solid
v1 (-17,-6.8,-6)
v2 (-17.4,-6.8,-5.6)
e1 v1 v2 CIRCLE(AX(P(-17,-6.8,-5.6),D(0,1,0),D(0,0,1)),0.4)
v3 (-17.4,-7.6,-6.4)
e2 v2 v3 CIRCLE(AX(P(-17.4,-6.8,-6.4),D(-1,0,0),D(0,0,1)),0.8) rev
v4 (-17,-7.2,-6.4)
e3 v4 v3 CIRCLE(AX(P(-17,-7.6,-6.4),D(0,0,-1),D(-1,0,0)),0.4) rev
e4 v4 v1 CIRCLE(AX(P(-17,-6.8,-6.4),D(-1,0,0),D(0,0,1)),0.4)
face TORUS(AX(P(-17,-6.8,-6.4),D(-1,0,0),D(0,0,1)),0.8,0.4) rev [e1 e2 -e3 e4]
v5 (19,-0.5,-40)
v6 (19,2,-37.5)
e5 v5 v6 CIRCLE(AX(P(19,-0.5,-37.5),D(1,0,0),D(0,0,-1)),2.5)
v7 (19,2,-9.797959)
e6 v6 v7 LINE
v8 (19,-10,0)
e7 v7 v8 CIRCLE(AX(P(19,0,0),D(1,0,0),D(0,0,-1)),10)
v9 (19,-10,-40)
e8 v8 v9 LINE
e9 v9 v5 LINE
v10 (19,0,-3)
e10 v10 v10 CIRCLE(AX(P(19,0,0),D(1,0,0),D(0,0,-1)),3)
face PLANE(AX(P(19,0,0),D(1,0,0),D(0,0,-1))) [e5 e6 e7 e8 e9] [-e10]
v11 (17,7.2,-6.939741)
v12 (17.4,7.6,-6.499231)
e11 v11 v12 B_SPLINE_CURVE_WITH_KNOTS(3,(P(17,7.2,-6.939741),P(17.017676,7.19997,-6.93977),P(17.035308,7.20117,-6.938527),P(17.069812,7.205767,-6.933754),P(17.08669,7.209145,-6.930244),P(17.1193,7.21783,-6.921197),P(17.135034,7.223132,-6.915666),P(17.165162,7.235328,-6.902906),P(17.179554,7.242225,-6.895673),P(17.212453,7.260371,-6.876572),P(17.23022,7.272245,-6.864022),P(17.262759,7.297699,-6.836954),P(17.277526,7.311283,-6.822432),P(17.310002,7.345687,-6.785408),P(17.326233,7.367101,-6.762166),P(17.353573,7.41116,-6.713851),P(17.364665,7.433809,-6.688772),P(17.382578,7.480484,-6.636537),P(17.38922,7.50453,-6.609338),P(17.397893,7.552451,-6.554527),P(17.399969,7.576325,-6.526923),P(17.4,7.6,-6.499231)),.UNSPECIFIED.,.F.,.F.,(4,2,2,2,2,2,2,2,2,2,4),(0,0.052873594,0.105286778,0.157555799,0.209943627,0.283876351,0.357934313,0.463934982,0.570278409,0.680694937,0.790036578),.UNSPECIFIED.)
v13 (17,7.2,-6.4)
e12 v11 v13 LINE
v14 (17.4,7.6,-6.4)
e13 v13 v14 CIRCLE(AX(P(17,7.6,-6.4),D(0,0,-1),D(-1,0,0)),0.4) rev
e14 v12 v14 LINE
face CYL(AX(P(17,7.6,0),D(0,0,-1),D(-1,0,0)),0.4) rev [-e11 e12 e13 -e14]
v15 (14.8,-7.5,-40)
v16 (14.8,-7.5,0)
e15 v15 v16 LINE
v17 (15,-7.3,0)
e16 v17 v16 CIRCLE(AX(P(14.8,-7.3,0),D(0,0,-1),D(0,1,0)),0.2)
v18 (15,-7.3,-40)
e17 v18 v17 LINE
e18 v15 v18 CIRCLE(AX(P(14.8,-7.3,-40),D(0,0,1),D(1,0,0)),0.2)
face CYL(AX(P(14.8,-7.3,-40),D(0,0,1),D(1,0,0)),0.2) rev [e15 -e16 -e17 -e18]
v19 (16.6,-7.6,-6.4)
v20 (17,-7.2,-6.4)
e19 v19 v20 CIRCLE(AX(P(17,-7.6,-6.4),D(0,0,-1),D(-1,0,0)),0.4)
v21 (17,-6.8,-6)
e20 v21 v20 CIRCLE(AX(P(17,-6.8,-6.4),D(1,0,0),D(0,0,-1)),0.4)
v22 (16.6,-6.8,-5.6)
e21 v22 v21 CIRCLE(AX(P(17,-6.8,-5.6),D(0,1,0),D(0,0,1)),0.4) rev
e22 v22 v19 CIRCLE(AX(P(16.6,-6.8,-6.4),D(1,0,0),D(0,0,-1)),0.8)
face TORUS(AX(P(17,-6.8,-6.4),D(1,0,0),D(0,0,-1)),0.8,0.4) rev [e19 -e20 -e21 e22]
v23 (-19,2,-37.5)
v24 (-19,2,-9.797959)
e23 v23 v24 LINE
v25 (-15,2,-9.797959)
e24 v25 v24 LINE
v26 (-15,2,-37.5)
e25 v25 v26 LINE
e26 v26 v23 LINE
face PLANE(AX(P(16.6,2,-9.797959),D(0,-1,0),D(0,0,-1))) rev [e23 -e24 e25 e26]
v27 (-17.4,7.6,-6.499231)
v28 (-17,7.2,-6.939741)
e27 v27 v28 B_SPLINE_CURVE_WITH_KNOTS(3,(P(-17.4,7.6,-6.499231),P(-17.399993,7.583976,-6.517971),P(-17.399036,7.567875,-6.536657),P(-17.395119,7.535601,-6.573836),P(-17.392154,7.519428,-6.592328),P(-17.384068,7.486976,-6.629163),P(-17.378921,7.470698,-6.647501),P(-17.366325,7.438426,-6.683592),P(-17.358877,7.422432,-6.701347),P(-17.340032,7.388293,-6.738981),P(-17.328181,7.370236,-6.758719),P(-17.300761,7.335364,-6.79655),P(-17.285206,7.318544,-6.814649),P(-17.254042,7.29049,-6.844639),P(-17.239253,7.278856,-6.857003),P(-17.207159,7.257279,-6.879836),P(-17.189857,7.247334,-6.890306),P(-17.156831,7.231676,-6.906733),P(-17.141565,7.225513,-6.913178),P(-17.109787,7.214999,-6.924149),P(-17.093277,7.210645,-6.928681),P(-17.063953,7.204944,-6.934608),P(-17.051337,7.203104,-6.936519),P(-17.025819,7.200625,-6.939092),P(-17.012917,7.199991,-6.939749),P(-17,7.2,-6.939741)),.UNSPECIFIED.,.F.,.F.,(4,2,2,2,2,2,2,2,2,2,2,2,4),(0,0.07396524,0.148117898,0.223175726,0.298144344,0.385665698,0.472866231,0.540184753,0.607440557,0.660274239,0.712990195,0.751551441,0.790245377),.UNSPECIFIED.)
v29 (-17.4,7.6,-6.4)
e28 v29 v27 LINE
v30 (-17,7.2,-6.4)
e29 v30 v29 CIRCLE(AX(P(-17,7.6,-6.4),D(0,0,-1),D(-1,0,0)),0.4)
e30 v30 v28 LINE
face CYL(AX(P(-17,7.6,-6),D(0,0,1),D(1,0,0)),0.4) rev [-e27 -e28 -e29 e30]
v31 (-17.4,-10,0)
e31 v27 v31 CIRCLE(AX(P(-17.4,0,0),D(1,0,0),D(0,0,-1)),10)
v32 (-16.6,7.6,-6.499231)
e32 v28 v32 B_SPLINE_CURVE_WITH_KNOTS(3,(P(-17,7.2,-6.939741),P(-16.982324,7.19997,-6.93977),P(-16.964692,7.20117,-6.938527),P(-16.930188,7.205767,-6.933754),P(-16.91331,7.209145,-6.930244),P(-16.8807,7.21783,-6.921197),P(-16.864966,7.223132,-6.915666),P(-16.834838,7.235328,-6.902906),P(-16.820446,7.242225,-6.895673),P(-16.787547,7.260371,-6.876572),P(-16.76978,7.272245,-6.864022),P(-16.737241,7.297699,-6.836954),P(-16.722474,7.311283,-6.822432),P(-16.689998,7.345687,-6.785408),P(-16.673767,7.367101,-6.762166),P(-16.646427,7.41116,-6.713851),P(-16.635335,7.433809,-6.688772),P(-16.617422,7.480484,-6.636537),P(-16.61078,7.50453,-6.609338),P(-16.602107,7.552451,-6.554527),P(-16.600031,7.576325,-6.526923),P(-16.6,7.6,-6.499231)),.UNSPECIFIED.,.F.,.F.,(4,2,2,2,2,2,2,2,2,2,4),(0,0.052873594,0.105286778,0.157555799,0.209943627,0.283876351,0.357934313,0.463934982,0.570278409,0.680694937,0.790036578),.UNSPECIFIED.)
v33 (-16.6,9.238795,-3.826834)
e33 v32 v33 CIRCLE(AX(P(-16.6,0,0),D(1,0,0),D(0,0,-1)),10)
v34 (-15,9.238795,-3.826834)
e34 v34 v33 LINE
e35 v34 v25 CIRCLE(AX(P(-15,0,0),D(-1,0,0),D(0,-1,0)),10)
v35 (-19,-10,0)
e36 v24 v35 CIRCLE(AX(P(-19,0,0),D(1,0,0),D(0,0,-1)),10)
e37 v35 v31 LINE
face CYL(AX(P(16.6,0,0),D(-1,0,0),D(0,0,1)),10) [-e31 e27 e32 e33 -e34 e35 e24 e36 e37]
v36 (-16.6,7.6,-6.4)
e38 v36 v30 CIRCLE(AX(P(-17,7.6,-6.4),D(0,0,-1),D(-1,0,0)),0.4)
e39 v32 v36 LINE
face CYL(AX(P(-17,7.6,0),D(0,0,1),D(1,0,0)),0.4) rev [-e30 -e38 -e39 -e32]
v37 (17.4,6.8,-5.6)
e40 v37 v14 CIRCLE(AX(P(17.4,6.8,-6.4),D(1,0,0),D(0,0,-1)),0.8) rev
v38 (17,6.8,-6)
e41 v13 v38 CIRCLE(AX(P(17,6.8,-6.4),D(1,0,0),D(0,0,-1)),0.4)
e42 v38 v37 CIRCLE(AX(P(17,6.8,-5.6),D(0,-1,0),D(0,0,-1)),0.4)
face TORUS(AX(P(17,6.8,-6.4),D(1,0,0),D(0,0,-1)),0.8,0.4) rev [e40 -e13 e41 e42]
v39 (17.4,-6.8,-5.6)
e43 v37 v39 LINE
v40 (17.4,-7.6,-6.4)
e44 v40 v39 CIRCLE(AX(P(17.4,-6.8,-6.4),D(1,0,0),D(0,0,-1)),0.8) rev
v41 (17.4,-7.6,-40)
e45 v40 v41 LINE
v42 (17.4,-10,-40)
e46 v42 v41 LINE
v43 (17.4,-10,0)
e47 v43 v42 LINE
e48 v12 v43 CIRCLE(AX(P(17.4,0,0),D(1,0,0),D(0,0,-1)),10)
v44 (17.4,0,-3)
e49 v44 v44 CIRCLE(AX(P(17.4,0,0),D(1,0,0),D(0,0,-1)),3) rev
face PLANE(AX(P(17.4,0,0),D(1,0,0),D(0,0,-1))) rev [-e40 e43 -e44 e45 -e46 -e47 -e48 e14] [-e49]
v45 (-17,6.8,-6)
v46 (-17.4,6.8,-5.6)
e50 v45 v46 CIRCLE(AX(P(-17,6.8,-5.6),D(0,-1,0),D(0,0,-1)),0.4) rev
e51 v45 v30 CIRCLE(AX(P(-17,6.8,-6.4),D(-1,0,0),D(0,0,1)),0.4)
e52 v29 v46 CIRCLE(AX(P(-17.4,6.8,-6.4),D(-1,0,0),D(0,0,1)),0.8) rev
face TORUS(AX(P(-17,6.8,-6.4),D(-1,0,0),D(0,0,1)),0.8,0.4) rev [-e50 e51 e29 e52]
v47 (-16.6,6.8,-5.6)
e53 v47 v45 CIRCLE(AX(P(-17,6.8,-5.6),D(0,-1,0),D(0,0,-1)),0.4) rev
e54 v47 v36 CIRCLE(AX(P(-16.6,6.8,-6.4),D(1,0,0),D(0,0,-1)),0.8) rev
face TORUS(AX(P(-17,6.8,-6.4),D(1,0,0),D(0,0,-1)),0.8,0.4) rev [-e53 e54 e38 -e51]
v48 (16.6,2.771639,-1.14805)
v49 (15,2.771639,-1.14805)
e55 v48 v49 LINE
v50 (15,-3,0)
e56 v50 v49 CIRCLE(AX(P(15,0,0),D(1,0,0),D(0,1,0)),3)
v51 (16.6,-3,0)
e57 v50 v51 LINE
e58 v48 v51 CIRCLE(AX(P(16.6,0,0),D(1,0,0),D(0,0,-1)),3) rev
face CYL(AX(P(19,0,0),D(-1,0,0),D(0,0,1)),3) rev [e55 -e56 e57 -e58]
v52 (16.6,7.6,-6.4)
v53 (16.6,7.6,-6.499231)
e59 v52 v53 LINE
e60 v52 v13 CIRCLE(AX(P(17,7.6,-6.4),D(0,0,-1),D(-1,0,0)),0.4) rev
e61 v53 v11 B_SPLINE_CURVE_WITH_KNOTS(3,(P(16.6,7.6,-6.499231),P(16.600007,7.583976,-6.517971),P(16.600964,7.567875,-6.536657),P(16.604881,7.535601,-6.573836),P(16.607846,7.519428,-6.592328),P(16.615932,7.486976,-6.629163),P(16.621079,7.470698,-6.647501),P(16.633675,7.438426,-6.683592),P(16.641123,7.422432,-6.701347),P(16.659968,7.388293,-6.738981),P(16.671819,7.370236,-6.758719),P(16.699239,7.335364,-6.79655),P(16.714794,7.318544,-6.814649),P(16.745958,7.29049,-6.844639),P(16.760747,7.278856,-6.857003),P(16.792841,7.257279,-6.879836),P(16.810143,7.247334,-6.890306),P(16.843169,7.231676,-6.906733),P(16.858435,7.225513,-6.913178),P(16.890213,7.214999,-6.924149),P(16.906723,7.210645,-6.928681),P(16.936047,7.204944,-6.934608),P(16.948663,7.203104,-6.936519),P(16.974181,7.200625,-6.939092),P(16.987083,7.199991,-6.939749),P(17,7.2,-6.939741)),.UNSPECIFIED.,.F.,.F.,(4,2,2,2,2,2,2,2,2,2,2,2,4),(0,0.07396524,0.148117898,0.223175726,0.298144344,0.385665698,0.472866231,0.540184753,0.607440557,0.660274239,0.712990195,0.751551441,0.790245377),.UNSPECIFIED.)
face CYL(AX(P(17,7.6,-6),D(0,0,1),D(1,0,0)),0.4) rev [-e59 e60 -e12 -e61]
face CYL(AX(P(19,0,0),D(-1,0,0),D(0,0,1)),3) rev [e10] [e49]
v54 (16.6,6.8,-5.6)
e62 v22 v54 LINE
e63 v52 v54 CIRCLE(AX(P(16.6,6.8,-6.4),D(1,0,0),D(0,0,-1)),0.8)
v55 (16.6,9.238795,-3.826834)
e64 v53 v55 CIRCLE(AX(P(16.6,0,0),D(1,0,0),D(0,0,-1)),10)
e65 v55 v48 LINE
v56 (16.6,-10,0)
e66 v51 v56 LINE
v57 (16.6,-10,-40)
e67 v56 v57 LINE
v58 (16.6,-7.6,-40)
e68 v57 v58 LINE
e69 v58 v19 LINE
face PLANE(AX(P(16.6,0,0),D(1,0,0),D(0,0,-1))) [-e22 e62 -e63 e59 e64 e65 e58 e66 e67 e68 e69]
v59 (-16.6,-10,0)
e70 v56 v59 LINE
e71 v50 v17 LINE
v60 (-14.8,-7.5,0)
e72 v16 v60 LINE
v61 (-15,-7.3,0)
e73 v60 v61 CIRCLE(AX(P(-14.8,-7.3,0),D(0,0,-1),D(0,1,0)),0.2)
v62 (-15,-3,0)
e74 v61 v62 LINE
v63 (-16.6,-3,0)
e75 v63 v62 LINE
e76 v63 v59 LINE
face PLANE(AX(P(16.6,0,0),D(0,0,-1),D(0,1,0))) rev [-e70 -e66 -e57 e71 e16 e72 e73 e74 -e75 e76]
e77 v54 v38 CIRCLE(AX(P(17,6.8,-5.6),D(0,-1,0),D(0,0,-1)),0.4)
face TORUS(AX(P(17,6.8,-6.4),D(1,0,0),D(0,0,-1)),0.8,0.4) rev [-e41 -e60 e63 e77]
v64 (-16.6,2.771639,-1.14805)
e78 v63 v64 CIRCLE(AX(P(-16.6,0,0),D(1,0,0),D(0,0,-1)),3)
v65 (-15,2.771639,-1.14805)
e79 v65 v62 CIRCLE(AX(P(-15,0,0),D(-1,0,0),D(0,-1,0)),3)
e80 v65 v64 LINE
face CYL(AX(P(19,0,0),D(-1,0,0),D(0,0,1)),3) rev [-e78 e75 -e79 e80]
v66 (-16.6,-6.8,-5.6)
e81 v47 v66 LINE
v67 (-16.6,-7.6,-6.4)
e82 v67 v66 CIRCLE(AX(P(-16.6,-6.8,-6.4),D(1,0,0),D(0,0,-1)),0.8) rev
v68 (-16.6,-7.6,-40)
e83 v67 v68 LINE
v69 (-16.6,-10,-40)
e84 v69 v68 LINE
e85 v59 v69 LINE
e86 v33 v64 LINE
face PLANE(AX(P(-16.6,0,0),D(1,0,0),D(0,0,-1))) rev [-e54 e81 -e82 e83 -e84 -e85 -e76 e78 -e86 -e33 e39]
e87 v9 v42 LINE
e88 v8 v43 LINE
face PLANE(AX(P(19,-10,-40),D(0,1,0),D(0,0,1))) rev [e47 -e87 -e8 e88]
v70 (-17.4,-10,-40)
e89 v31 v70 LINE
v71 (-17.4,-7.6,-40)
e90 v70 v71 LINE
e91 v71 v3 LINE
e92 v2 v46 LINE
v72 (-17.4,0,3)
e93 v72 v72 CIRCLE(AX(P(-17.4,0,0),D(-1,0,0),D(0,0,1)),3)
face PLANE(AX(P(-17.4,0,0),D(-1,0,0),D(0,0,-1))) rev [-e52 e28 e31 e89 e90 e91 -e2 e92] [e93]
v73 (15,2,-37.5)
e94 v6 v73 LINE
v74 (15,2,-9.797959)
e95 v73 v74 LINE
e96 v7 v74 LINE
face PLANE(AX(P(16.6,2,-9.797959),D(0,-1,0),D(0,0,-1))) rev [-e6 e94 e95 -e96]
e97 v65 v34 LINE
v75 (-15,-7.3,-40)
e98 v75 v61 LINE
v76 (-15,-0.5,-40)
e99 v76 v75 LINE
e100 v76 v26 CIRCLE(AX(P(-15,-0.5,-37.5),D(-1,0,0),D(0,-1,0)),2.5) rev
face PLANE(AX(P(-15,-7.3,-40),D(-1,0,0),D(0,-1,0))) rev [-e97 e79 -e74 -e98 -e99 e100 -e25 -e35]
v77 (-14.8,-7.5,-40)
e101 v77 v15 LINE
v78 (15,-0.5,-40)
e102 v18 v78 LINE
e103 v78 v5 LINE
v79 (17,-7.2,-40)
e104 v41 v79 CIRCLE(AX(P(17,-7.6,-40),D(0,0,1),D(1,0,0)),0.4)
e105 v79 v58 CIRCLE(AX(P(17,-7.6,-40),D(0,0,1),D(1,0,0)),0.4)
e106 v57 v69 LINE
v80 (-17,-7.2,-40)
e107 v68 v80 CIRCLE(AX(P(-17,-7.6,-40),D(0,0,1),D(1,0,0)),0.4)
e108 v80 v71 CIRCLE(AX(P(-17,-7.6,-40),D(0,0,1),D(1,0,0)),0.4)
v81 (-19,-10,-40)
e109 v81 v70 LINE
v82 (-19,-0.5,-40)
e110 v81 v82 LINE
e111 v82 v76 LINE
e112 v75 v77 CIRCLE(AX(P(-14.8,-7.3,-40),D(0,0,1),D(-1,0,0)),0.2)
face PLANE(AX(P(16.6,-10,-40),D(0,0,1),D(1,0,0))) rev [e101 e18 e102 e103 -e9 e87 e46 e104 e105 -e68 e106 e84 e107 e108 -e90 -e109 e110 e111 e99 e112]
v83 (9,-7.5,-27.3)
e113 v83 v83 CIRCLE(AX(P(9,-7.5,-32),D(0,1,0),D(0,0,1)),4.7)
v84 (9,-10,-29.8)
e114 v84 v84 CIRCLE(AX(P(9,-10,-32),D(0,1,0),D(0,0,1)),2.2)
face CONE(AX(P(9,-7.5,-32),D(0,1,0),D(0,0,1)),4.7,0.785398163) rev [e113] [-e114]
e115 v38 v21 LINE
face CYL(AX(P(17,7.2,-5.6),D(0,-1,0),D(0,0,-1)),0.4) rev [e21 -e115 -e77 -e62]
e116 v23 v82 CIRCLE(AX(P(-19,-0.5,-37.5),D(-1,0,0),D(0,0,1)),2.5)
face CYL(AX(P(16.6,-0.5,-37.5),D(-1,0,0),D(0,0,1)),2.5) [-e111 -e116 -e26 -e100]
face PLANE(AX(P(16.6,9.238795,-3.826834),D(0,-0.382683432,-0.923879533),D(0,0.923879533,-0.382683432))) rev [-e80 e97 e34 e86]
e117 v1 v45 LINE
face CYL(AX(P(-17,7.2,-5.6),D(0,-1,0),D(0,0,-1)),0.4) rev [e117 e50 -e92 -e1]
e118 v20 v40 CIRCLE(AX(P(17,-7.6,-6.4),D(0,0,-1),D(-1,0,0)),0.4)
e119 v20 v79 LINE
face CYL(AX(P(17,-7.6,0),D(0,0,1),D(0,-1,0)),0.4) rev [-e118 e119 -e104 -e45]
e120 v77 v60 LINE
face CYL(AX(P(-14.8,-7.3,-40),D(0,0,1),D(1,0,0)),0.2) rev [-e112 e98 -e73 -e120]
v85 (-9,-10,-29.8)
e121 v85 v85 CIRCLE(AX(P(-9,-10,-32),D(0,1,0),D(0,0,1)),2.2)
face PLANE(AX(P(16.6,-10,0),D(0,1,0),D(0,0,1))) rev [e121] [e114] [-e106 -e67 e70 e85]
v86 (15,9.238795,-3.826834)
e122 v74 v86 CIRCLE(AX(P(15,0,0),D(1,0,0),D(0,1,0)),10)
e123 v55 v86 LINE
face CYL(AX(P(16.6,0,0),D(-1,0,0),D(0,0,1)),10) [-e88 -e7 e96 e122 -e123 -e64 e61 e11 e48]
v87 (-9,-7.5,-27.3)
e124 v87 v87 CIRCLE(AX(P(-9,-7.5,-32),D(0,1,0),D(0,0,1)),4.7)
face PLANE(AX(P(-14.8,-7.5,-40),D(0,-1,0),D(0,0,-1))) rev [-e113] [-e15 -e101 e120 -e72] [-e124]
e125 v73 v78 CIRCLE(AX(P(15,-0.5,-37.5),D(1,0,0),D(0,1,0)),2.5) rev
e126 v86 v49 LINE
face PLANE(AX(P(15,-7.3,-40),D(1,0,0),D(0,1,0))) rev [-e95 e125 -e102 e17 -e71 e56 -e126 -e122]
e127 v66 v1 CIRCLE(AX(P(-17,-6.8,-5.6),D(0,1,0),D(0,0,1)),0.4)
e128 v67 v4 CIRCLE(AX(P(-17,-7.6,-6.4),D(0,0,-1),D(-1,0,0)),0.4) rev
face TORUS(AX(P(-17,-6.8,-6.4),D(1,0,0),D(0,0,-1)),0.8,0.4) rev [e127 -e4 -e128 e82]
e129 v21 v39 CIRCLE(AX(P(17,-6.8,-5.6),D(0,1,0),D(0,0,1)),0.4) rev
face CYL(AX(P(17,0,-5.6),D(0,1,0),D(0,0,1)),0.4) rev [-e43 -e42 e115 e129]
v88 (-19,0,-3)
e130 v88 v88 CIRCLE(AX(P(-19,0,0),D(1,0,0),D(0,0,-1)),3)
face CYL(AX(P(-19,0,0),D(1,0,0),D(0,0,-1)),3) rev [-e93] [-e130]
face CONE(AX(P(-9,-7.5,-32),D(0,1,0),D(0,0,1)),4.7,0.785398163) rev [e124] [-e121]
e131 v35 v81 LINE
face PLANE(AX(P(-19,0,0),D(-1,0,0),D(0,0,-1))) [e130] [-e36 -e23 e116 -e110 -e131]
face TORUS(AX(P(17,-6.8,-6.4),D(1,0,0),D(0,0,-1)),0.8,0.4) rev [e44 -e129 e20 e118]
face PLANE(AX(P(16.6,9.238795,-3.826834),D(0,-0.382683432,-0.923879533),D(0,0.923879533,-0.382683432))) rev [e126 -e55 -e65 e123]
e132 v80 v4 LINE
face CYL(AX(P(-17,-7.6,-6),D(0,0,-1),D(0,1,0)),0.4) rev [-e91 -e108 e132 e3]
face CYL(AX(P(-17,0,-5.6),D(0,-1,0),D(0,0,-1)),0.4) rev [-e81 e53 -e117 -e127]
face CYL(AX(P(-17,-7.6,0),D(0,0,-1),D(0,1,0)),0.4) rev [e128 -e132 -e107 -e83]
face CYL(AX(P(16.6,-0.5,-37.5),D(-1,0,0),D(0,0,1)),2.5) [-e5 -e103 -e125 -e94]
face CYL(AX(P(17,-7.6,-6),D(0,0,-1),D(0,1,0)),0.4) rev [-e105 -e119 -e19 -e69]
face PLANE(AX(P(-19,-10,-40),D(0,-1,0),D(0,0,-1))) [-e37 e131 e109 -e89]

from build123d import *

# Parameters (mm, degrees)
BOSS_EXTRUDE5_START         = -16.6
BOSS_EXTRUDE5_DEPTH         = 33.2
BOSS_EXTRUDE6_DEPTH         = 0.8
BOSS_EXTRUDE7_DEPTH         = 1.6
FILLET16_R                  = 0.4
SKETCH6_R                   = 3
CUT_EXTRUDE2_DEPTH          = 46.398237851
FILLET16_OF_MIRROR1_R       = 0.4
CUT_EXTRUDE3_DEPTH          = 46.398237851
CUT_EXTRUDE3_DEPTH_BACK     = 46.398237851
FILLET_1_R                  = 2.5
HOLE_WIZARD_M42_D           = 4.2
HOLE_WIZARD_M42_DEPTH       = 8.5
HOLE_WIZARD_M42_CSINK_D     = 9.4
HOLE_WIZARD_M42_CSINK_ANGLE = 90
HOLE_WIZARD_M42_TIP         = 1.2618073


# Read off the part's stored shape, not the designer's step: Boss-Extrude5
with BuildPart() as part:
    # Boss-Extrude5 outline → Boss-Extrude5 (new body)
    with BuildSketch(Plane(origin=(0, 0, 0), x_dir=(0, 0, -1), z_dir=(1, 0, 0)).offset(BOSS_EXTRUDE5_START)):
        with BuildLine():
            Line((3.826834324, 9.238795325), (0, 0))
            Line((0, 0), (0, -10))
            Line((0, -10), (40, -10))
            Line((40, -10), (40, 2))
            Line((40, 2), (9.797958971, 2))
            ThreePointArc((9.797958971, 2), (7.7141939, 6.36327058), (3.826834324, 9.238795325))
        make_face()
    extrude(amount=BOSS_EXTRUDE5_DEPTH)

    # Sketch9 → Boss-Extrude6 (add)
    with BuildSketch(Plane(origin=(16.6, 0, 0), x_dir=(0, 0, -1), z_dir=(1, 0, 0))):
        with BuildLine():
            Line((6, 7.2), (6.939740629, 7.2))
            ThreePointArc((6.939740629, 7.2), (8.763426669, 4.816882085), (9.797958971, 2))
            Line((9.797958971, 2), (40, 2))
            Line((40, 2), (40, -7.2))
            Line((40, -7.2), (6, -7.2))
            Line((6, -7.2), (6, 7.2))
        make_face()
    boss_extrude6 = extrude(amount=BOSS_EXTRUDE6_DEPTH)

    # Sketch10 → Boss-Extrude7 (add)
    with BuildSketch(Plane(origin=(17.4, 0, 0), x_dir=(0, 0, -1), z_dir=(1, 0, 0))):
        with BuildLine():
            Line((40, 2), (40, -10))
            Line((40, -10), (0, -10))
            ThreePointArc((0, -10), (-10, 0), (0, 10))
            ThreePointArc((0, 10), (6.32455532, 7.745966692), (9.797958971, 2))
            Line((9.797958971, 2), (40, 2))
        make_face()
    boss_extrude7 = extrude(amount=BOSS_EXTRUDE7_DEPTH)

    # Fillet16
    # the kernel refuses this fillet: 0.4 mm, written as the material it takes off along each edge
    with BuildSketch(Plane(origin=(16.6, 7.2, -6), x_dir=(0, -1, 0), z_dir=(1, 0, 0)), Plane(origin=(16.6, -7.2, -6), x_dir=(0, 0, -1), z_dir=(1, 0, 0))) as fillet16_piece_1:
        with BuildLine():
            CenterArc((FILLET16_R, FILLET16_R), FILLET16_R, 180, 90)
            Line((0, FILLET16_R), (0, 0))
            Line((0, 0), (FILLET16_R, 0))
        make_face()
    extrude(amount=0.8, mode=Mode.SUBTRACT)
    # the kernel refuses this fillet: 0.4 mm, written as the material it adds along each edge
    with BuildSketch(Plane(origin=(16.6, -6.8, -6), x_dir=(0, 0, 1), z_dir=(0, 1, 0))) as fillet16_2_piece_1:
        with BuildLine():
            CenterArc((FILLET16_R, FILLET16_R), FILLET16_R, 180, 90)
            Line((0, FILLET16_R), (0, 0))
            Line((0, 0), (FILLET16_R, 0))
        make_face()
    extrude(amount=13.6)
    with BuildSketch(Plane(origin=(16.6, -7.2, -40), x_dir=(0, -1, 0), z_dir=(0, 0, 1))) as fillet16_2_piece_2:
        with BuildLine():
            CenterArc((FILLET16_R, FILLET16_R), FILLET16_R, 180, 90)
            Line((0, FILLET16_R), (0, 0))
            Line((0, 0), (FILLET16_R, 0))
        make_face()
    extrude(amount=33.6)
    with BuildSketch(Plane(origin=(16.6, 7.2, -6.4), x_dir=(0, 1, 0), z_dir=(0, 0, -1))) as fillet16_2_piece_3_section:
        with BuildLine():
            CenterArc((FILLET16_R, FILLET16_R), FILLET16_R, 180, 90)
            Line((0, FILLET16_R), (0, 0))
            Line((0, 0), (FILLET16_R, 0))
        make_face()
    fillet16_2_piece_3 = extrude(amount=1.539740629, mode=Mode.PRIVATE)
    fillet16_2_piece_3 = fillet16_2_piece_3 & Plane(origin=(16.701201478, 1e-09, -1e-09), x_dir=(0, 0.1999999999466582, -0.9797958971241596), z_dir=(-1, 0, 0)) * Cylinder(9.999999999, 5, mode=Mode.PRIVATE)
    add(fillet16_2_piece_3)
    with BuildSketch(Plane(origin=(17.4, -6.8, -6), x_dir=(0, 0, 1), z_dir=(0, 1, 0))) as fillet16_2_piece_4:
        with BuildLine():
            CenterArc((FILLET16_R, -FILLET16_R), FILLET16_R, 90, 90)
            Line((0, -FILLET16_R), (0, 0))
            Line((0, 0), (FILLET16_R, 0))
        make_face()
    extrude(amount=13.6)
    with BuildSketch(Plane(origin=(17.4, -7.2, -40), x_dir=(0, -1, 0), z_dir=(0, 0, 1))) as fillet16_2_piece_5:
        with BuildLine():
            CenterArc((FILLET16_R, -FILLET16_R), FILLET16_R, 90, 90)
            Line((0, -FILLET16_R), (0, 0))
            Line((0, 0), (FILLET16_R, 0))
        make_face()
    extrude(amount=33.6)
    with BuildSketch(Plane(origin=(17.4, 7.2, -6.4), x_dir=(-1, 0, 0), z_dir=(0, 0, -1))) as fillet16_2_piece_6_section:
        with BuildLine():
            CenterArc((FILLET16_R, FILLET16_R), FILLET16_R, 180, 90)
            Line((0, FILLET16_R), (0, 0))
            Line((0, 0), (FILLET16_R, 0))
        make_face()
    fillet16_2_piece_6 = extrude(amount=1.539740629, mode=Mode.PRIVATE)
    fillet16_2_piece_6 = fillet16_2_piece_6 & Plane(origin=(17.298798559, 1e-09, -1e-09), x_dir=(0, 0.1999999999466582, -0.9797958971241596), z_dir=(-1, 0, 0)) * Cylinder(9.999999999, 5, mode=Mode.PRIVATE)
    add(fillet16_2_piece_6)
    with BuildSketch(Plane(origin=(17.4, 6.8, -6.4), x_dir=(0, 0, 1), z_dir=(0, -1, 0))) as fillet16_2_piece_7:
        with BuildLine():
            CenterArc((0.4 + FILLET16_R, FILLET16_R), FILLET16_R, 180, 90)
            Line((0.4, FILLET16_R), (0.4, 0))
            Line((0.4, 0), (0.4 + FILLET16_R, 0))
        make_face()
    revolve(axis=Axis((17.4, 6.8, -6.4), (-1, 0, 0)), revolution_arc=90)
    with BuildSketch(Plane(origin=(17.4, -6.8, -6.4), x_dir=(0, -1, 0), z_dir=(0, 0, -1))) as fillet16_2_piece_8:
        with BuildLine():
            CenterArc((0.4 + FILLET16_R, FILLET16_R), FILLET16_R, 180, 90)
            Line((0.4, FILLET16_R), (0.4, 0))
            Line((0.4, 0), (0.4 + FILLET16_R, 0))
        make_face()
    revolve(axis=Axis((17.4, -6.8, -6.4), (-1, 0, 0)), revolution_arc=90)
    with BuildSketch(Plane(origin=(16.6, 6.8, -6.4), x_dir=(0, 0, 1), z_dir=(0, -1, 0))) as fillet16_2_piece_9:
        with BuildLine():
            CenterArc((0.4 + FILLET16_R, -FILLET16_R), FILLET16_R, 90, 90)
            Line((0.4, -FILLET16_R), (0.4, 0))
            Line((0.4, 0), (0.4 + FILLET16_R, 0))
        make_face()
    revolve(axis=Axis((16.6, 6.8, -6.4), (-1, 0, 0)), revolution_arc=90)
    with BuildSketch(Plane(origin=(16.6, -6.8, -6.4), x_dir=(0, -1, 0), z_dir=(0, 0, -1))) as fillet16_2_piece_10:
        with BuildLine():
            CenterArc((0.4 + FILLET16_R, -FILLET16_R), FILLET16_R, 90, 90)
            Line((0.4, -FILLET16_R), (0.4, 0))
            Line((0.4, 0), (0.4 + FILLET16_R, 0))
        make_face()
    revolve(axis=Axis((16.6, -6.8, -6.4), (-1, 0, 0)), revolution_arc=90)

    # Sketch6 → Cut-Extrude2 (cut, through all)
    with BuildSketch(Plane(origin=(0, 0, 0), x_dir=(0, 0, -1), z_dir=(1, 0, 0))):
        Circle(SKETCH6_R)
    cut_extrude2 = extrude(amount=CUT_EXTRUDE2_DEPTH, mode=Mode.SUBTRACT)

    # Mirror1: Boss-Extrude6, Boss-Extrude7, Cut-Extrude2 across plane
    add(boss_extrude6.mirror(Plane(origin=(0, 0, 0), x_dir=(0, 0, 1), z_dir=(1, 0, 0))))
    add(boss_extrude7.mirror(Plane(origin=(0, 0, 0), x_dir=(0, 0, 1), z_dir=(1, 0, 0))))
    add(cut_extrude2.mirror(Plane(origin=(0, 0, 0), x_dir=(0, 0, 1), z_dir=(1, 0, 0))), mode=Mode.SUBTRACT)

    # Fillet16 of Mirror1
    # the kernel refuses this fillet: 0.4 mm, written as the material it takes off along each edge
    with BuildSketch(Plane(origin=(-16.6, 7.2, -6), x_dir=(0, 0, -1), z_dir=(-1, 0, 0)), Plane(origin=(-16.6, -7.2, -6), x_dir=(0, 1, 0), z_dir=(-1, 0, 0))) as fillet16_of_mirror1_piece_1:
        with BuildLine():
            CenterArc((FILLET16_OF_MIRROR1_R, FILLET16_OF_MIRROR1_R), FILLET16_OF_MIRROR1_R, 180, 90)
            Line((0, FILLET16_OF_MIRROR1_R), (0, 0))
            Line((0, 0), (FILLET16_OF_MIRROR1_R, 0))
        make_face()
    extrude(amount=0.8, mode=Mode.SUBTRACT)
    # the kernel refuses this fillet: 0.4 mm, written as the material it adds along each edge
    with BuildSketch(Plane(origin=(-16.6, -6.8, -6), x_dir=(-1, 0, 0), z_dir=(0, 1, 0))) as fillet16_of_mirror1_2_piece_1:
        with BuildLine():
            CenterArc((FILLET16_OF_MIRROR1_R, FILLET16_OF_MIRROR1_R), FILLET16_OF_MIRROR1_R, 180, 90)
            Line((0, FILLET16_OF_MIRROR1_R), (0, 0))
            Line((0, 0), (FILLET16_OF_MIRROR1_R, 0))
        make_face()
    extrude(amount=13.6)
    with BuildSketch(Plane(origin=(-16.6, -7.2, -40), x_dir=(-1, 0, 0), z_dir=(0, 0, 1)), Plane(origin=(-17.4, -7.2, -40), x_dir=(0, -1, 0), z_dir=(0, 0, 1))) as fillet16_of_mirror1_2_piece_2:
        with BuildLine():
            CenterArc((FILLET16_OF_MIRROR1_R, FILLET16_OF_MIRROR1_R), FILLET16_OF_MIRROR1_R, 180, 90)
            Line((0, FILLET16_OF_MIRROR1_R), (0, 0))
            Line((0, 0), (FILLET16_OF_MIRROR1_R, 0))
        make_face()
    extrude(amount=33.6)
    with BuildSketch(Plane(origin=(-16.6, 7.2, -6.4), x_dir=(-1, 0, 0), z_dir=(0, 0, -1))) as fillet16_of_mirror1_2_piece_3_section:
        with BuildLine():
            CenterArc((FILLET16_OF_MIRROR1_R, FILLET16_OF_MIRROR1_R), FILLET16_OF_MIRROR1_R, 180, 90)
            Line((0, FILLET16_OF_MIRROR1_R), (0, 0))
            Line((0, 0), (FILLET16_OF_MIRROR1_R, 0))
        make_face()
    fillet16_of_mirror1_2_piece_3 = extrude(amount=1.539740629, mode=Mode.PRIVATE)
    fillet16_of_mirror1_2_piece_3 = fillet16_of_mirror1_2_piece_3 & Plane(origin=(-16.701201441, 1e-09, -1e-09), x_dir=(0, 0.1999999999466582, -0.9797958971241596), z_dir=(-1, 0, 0)) * Cylinder(9.999999999, 5, mode=Mode.PRIVATE)
    add(fillet16_of_mirror1_2_piece_3)
    with BuildSketch(Plane(origin=(-17.4, -6.8, -6), x_dir=(1, 0, 0), z_dir=(0, 1, 0))) as fillet16_of_mirror1_2_piece_4:
        with BuildLine():
            CenterArc((FILLET16_OF_MIRROR1_R, -FILLET16_OF_MIRROR1_R), FILLET16_OF_MIRROR1_R, 90, 90)
            Line((0, -FILLET16_OF_MIRROR1_R), (0, 0))
            Line((0, 0), (FILLET16_OF_MIRROR1_R, 0))
        make_face()
    extrude(amount=13.6)
    with BuildSketch(Plane(origin=(-17.4, 7.2, -6.4), x_dir=(1, 0, 0), z_dir=(0, 0, -1))) as fillet16_of_mirror1_2_piece_5_section:
        with BuildLine():
            CenterArc((FILLET16_OF_MIRROR1_R, -FILLET16_OF_MIRROR1_R), FILLET16_OF_MIRROR1_R, 90, 90)
            Line((0, -FILLET16_OF_MIRROR1_R), (0, 0))
            Line((0, 0), (FILLET16_OF_MIRROR1_R, 0))
        make_face()
    fillet16_of_mirror1_2_piece_5 = extrude(amount=1.539740629, mode=Mode.PRIVATE)
    fillet16_of_mirror1_2_piece_5 = fillet16_of_mirror1_2_piece_5 & Plane(origin=(-17.298798559, 1e-09, -1e-09), x_dir=(0, 0.1999999999466582, -0.9797958971241596), z_dir=(-1, 0, 0)) * Cylinder(9.999999999, 5, mode=Mode.PRIVATE)
    add(fillet16_of_mirror1_2_piece_5)
    with BuildSketch(Plane(origin=(-17.4, 6.8, -6.4), x_dir=(0, 1, 0), z_dir=(0, 0, -1))) as fillet16_of_mirror1_2_piece_6:
        with BuildLine():
            CenterArc((0.4 + FILLET16_OF_MIRROR1_R, FILLET16_OF_MIRROR1_R), FILLET16_OF_MIRROR1_R, 180, 90)
            Line((0.4 + FILLET16_OF_MIRROR1_R, 0), (0.4, 0))
            Line((0.4, 0), (0.4, FILLET16_OF_MIRROR1_R))
        make_face()
    revolve(axis=Axis((-17.4, 6.8, -6.4), (1, 0, 0)), revolution_arc=90)
    with BuildSketch(Plane(origin=(-17.4, -6.8, -6.4), x_dir=(0, 0, 1), z_dir=(0, 1, 0))) as fillet16_of_mirror1_2_piece_7:
        with BuildLine():
            CenterArc((0.4 + FILLET16_OF_MIRROR1_R, FILLET16_OF_MIRROR1_R), FILLET16_OF_MIRROR1_R, 180, 90)
            Line((0.4 + FILLET16_OF_MIRROR1_R, 0), (0.4, 0))
            Line((0.4, 0), (0.4, FILLET16_OF_MIRROR1_R))
        make_face()
    revolve(axis=Axis((-17.4, -6.8, -6.4), (1, 0, 0)), revolution_arc=90)
    with BuildSketch(Plane(origin=(-16.6, 6.8, -6.4), x_dir=(0, 1, 0), z_dir=(0, 0, -1))) as fillet16_of_mirror1_2_piece_8:
        with BuildLine():
            CenterArc((0.4 + FILLET16_OF_MIRROR1_R, -FILLET16_OF_MIRROR1_R), FILLET16_OF_MIRROR1_R, 90, 90)
            Line((0.4 + FILLET16_OF_MIRROR1_R, 0), (0.4, 0))
            Line((0.4, 0), (0.4, -FILLET16_OF_MIRROR1_R))
        make_face()
    revolve(axis=Axis((-16.6, 6.8, -6.4), (1, 0, 0)), revolution_arc=90)
    with BuildSketch(Plane(origin=(-16.6, -6.8, -6.4), x_dir=(0, 0, 1), z_dir=(0, 1, 0))) as fillet16_of_mirror1_2_piece_9:
        with BuildLine():
            CenterArc((0.4 + FILLET16_OF_MIRROR1_R, -FILLET16_OF_MIRROR1_R), FILLET16_OF_MIRROR1_R, 90, 90)
            Line((0.4 + FILLET16_OF_MIRROR1_R, 0), (0.4, 0))
            Line((0.4, 0), (0.4, -FILLET16_OF_MIRROR1_R))
        make_face()
    revolve(axis=Axis((-16.6, -6.8, -6.4), (1, 0, 0)), revolution_arc=90)

    # Sketch7 → Cut-Extrude3 (cut, two sides: drawn at the far end of the back side and taken through both)
    with BuildSketch(Plane.XY.offset(-CUT_EXTRUDE3_DEPTH_BACK)):
        with BuildLine():
            Line((-14.8, -7.5), (14.8, -7.5))
            ThreePointArc((14.8, -7.5), (14.941421356, -7.441421356), (15, -7.3))
            Line((15, -7.3), (15, 12.3))
            ThreePointArc((15, 12.3), (14.941421356, 12.441421356), (14.8, 12.5))
            Line((14.8, 12.5), (-14.8, 12.5))
            ThreePointArc((-14.8, 12.5), (-14.941421356, 12.441421356), (-15, 12.3))
            Line((-15, 12.3), (-15, -7.3))
            ThreePointArc((-15, -7.3), (-14.941421356, -7.441421356), (-14.8, -7.5))
        make_face()
    extrude(amount=CUT_EXTRUDE3_DEPTH + CUT_EXTRUDE3_DEPTH_BACK, mode=Mode.SUBTRACT)

    # Скругление1
    fillet_1_edges = [part.edges().sort_by_distance(p)[0] for p in [
        (17, 2, -40),
        (-17, 2, -40),
    ]]
    fillet(fillet_1_edges, radius=FILLET_1_R)

    # Зенковка для винта с полупотайной головкой M42
    with Locations(Plane(origin=(9, -7.5, -32), x_dir=(0, 0, 1), z_dir=(0, 1, 0))):
        with Locations((0, 0), (0, -18)):
            CounterSinkHole(HOLE_WIZARD_M42_D / 2, HOLE_WIZARD_M42_CSINK_D / 2, depth=HOLE_WIZARD_M42_DEPTH, counter_sink_angle=HOLE_WIZARD_M42_CSINK_ANGLE)
            with Locations((0, 0, -(HOLE_WIZARD_M42_DEPTH + HOLE_WIZARD_M42_TIP / 2))):  # 118° drill point
                Cone(0, HOLE_WIZARD_M42_D / 2, HOLE_WIZARD_M42_TIP, mode=Mode.SUBTRACT)


solid = part.part
